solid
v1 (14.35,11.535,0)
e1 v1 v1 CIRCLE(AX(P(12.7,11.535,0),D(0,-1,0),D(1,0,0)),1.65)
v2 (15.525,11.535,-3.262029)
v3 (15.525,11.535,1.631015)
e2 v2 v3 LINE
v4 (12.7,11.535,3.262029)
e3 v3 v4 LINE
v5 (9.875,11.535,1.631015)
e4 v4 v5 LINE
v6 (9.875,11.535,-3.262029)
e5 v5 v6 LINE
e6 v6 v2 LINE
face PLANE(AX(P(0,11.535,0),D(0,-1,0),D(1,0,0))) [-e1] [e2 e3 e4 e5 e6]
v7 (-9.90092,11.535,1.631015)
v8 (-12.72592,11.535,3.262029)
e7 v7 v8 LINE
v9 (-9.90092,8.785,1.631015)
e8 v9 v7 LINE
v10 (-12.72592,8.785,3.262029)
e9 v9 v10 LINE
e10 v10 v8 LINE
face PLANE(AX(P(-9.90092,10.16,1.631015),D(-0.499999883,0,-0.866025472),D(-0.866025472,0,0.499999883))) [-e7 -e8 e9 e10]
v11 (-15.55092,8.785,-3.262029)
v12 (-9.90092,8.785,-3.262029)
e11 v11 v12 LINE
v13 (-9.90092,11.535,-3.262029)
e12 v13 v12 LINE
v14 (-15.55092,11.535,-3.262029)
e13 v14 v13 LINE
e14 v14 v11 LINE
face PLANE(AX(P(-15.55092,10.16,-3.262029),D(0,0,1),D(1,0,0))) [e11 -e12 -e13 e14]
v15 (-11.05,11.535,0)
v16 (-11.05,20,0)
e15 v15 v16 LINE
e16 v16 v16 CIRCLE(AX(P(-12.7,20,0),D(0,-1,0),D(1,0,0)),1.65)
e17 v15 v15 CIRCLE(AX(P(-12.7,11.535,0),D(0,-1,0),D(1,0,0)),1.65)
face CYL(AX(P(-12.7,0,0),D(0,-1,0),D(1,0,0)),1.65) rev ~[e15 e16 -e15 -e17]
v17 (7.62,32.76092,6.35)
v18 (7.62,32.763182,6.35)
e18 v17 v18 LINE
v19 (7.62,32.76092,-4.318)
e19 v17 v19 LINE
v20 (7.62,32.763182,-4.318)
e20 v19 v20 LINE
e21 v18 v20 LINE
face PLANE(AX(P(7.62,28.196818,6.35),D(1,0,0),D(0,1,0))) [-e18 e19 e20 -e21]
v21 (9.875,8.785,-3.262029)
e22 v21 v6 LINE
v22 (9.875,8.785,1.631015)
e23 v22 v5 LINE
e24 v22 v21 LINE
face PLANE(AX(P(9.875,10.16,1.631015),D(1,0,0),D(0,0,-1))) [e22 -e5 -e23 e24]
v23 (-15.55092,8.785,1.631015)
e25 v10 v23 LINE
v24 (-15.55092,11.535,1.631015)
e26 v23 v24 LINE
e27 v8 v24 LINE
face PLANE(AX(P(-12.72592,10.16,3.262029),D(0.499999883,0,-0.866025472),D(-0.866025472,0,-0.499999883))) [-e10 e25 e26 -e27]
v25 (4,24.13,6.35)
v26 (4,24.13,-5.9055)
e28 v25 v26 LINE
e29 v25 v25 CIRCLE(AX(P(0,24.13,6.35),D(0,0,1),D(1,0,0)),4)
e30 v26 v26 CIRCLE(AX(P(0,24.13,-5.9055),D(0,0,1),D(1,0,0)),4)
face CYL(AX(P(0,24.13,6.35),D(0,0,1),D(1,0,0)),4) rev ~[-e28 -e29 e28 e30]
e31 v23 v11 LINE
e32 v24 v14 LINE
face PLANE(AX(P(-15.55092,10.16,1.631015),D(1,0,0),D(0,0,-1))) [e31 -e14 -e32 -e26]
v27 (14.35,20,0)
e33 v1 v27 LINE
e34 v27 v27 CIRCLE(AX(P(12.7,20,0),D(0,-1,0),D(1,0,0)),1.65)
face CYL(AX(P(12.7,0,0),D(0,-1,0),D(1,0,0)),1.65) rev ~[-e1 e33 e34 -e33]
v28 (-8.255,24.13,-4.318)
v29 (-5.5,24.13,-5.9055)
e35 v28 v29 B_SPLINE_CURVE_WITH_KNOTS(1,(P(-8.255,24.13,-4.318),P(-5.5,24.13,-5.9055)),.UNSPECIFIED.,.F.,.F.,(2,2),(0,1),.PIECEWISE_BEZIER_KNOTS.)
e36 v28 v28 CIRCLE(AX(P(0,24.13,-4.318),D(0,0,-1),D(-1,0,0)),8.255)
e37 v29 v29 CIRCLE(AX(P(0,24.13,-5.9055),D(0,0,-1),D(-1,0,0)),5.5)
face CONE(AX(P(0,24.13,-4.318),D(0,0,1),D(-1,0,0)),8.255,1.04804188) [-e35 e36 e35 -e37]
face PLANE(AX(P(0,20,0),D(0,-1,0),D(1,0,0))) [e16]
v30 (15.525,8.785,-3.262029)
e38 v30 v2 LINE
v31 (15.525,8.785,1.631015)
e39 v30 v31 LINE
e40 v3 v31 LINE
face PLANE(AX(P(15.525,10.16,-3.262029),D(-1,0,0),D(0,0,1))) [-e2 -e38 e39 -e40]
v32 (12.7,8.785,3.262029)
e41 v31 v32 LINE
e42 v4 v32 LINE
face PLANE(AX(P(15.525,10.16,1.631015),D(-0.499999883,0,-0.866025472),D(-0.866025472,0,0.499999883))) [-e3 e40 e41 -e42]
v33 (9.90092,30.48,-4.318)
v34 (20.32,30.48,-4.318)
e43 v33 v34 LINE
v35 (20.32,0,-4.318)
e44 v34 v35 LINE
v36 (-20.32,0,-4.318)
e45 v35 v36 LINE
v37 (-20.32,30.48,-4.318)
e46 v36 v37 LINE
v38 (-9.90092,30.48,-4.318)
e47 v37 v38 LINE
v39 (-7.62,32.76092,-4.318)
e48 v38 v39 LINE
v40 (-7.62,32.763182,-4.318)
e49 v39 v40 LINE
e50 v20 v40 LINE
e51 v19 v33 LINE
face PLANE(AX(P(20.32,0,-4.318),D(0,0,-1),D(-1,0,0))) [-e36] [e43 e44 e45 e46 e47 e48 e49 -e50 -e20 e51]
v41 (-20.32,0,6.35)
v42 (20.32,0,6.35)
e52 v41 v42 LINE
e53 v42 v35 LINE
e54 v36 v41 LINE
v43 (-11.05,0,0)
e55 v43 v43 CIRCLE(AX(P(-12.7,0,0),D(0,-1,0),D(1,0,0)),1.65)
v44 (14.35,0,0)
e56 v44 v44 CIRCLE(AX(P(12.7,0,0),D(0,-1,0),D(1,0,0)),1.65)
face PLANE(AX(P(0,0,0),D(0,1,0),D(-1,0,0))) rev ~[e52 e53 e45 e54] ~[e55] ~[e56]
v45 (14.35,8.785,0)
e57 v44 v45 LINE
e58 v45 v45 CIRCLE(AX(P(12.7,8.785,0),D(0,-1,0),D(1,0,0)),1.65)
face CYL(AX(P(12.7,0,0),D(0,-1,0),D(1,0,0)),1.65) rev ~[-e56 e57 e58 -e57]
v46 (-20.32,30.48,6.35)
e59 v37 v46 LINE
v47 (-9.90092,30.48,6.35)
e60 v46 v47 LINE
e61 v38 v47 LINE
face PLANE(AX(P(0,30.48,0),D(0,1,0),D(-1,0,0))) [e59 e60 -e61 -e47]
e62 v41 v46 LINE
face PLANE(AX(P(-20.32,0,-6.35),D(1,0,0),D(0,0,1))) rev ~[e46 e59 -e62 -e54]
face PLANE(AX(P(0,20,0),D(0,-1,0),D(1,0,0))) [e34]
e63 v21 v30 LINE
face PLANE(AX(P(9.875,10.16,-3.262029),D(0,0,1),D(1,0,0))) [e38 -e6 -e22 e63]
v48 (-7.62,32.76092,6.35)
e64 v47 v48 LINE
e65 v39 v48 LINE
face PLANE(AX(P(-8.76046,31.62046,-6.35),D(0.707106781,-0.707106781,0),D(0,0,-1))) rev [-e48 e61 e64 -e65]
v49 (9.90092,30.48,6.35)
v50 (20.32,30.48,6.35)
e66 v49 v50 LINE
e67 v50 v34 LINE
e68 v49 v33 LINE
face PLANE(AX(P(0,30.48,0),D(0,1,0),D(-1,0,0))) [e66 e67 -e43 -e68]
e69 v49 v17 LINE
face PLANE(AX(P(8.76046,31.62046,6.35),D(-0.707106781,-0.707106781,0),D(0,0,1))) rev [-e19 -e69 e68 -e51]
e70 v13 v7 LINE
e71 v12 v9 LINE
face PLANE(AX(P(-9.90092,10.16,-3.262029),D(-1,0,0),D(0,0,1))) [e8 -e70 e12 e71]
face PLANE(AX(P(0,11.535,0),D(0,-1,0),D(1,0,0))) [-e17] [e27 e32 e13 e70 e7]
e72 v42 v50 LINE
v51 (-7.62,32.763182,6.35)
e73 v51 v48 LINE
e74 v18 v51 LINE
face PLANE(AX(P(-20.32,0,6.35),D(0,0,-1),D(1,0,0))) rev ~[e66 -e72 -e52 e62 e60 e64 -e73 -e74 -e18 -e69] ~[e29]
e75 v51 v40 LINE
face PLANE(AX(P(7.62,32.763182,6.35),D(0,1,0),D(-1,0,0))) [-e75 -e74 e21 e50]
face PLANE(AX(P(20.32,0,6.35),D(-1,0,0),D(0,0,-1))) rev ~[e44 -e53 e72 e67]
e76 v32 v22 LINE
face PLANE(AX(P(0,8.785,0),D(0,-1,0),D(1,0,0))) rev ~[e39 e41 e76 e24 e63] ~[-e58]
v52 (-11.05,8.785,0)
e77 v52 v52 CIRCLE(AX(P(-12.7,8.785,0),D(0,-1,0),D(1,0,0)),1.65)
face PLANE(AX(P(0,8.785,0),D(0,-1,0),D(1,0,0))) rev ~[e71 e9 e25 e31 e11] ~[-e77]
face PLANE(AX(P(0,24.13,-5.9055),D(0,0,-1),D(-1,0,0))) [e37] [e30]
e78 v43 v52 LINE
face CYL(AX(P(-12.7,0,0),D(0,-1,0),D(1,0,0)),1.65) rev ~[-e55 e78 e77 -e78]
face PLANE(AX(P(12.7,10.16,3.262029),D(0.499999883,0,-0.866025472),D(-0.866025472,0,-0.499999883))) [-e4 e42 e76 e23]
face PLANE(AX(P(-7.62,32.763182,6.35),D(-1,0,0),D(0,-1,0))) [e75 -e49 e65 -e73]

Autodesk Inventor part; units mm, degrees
sketch "Sketch3" plane through (0, 0, 0) normal (0, 1, 0) x (-1, 0, 0)
  line L0 (-20.32, 6.35) -> (20.32, 6.35)
  line L1 (20.32, 6.35) -> (20.32, -6.35)
  line L2 (20.32, -6.35) -> (-20.32, -6.35)
  line L3 (-20.32, -6.35) -> (-20.32, 6.35)
  line L4 (-20.32, 6.35) -> (20.32, -6.35) construction
  line L5 (20.32, 6.35) -> (-20.32, -6.35) construction
  point P0 (0, 0)
  dimension "d0" = 40.64
  dimension "d1" = 12.7
sketch "Sketch3 outline for Extrusion1" plane through (0, 0, 0) normal (0, 1, 0) x (-1, 0, 0)
  line L0 (-20.32, 6.35) -> (-20.32, -6.35)
  line L1 (20.32, 6.35) -> (-20.32, 6.35)
  line L2 (20.32, -6.35) -> (20.32, 6.35)
  line L3 (-20.32, -6.35) -> (20.32, -6.35)
extrude "Extrusion1" add sketch "Sketch3 outline for Extrusion1" along normal blind 30.48
sketch "Sketch4" plane through (-20.32, 0, 6.35) normal (0, 0, 1) x (1, 0, 0)
  line L0 (20.32, 0) -> (20.32, 24.13) construction
  circle A0 centre (20.32, 24.13) radius 4
  line L1 (12.7, 28.196818) -> (27.94, 28.196818)
  line L2 (27.94, 28.196818) -> (27.94, 32.763182)
  line L3 (27.94, 32.763182) -> (12.7, 32.763182)
  line L4 (12.7, 32.763182) -> (12.7, 28.196818)
  line L5 (40.64, 30.48) -> (0, 30.48)
  line L6 (12.7, 28.196818) -> (27.94, 32.763182) construction
  line L7 (27.94, 28.196818) -> (12.7, 32.763182) construction
  point P0 (20.32, 30.48)
  dimension "d4" = 24.13
  dimension "d5" = 8
  dimension "d6" = 15.24
sketch "Sketch4 outline for Extrusion2" plane through (-20.32, 0, 6.35) normal (0, 0, 1) x (1, 0, 0)
  line L0 (27.94, 32.763182) -> (12.7, 32.763182)
  line L1 (27.94, 28.196818) -> (27.94, 32.763182)
  line L2 (12.7, 28.196818) -> (27.94, 28.196818)
  line L3 (12.7, 32.763182) -> (12.7, 28.196818)
extrude "Extrusion2" add sketch "Sketch4 outline for Extrusion2" against normal up to surface (12.7 mm away)
sketch "Sketch4 outline for Extrusion3" plane through (-20.32, 0, 6.35) normal (0, 0, 1) x (1, 0, 0)
  circle A0 centre (20.32, 24.13) radius 4
extrude "Extrusion3" cut sketch "Sketch4 outline for Extrusion3" against normal blind 22.225
chamfer "Chamfer1" distance 2.28092 angle 45 2 edges at (7.62, 30.48, 0) (-7.62, 30.48, 0)
sketch "Sketch5" plane through (0, 0, 0) normal (0, -1, 0) x (1, 0, 0)
  line L0 (0, 0) -> (-12.7, 0) construction
  line L1 (0, 0) -> (12.7, 0) construction
  circle A0 centre (-12.7, 0) radius 1.65
  circle A1 centre (12.7, 0) radius 1.65
  dimension "d14" = 12.7
  dimension "d15" = 12.7
  dimension "d16" = 3.3
  dimension "d17" = 3.3
sketch "Sketch5 outline for Extrusion4" plane through (0, 0, 0) normal (0, -1, 0) x (1, 0, 0)
  circle A0 centre (12.7, 0) radius 1.65
  circle A1 centre (-12.7, 0) radius 1.65
extrude "Extrusion4" cut sketch "Sketch5 outline for Extrusion4" against normal blind 20
ref_plane "Work Plane1" through (20.32, 0, -4.318) normal (0, 0, -1) x (-1, 0, 0)
sketch "Sketch6" plane through (20.32, 0, -4.318) normal (0, 0, -1) x (-1, 0, 0)
  line L0 (0, 30.48) -> (10.41908, 30.48)
  line L1 (0, 0) -> (0, 30.48)
  line L2 (0, 0) -> (40.64, 0)
  line L3 (40.64, 0) -> (40.64, 30.48)
  line L4 (30.22092, 30.48) -> (40.64, 30.48)
  line L5 (27.94, 32.76092) -> (30.22092, 30.48)
  line L6 (12.7, 32.763182) -> (27.94, 32.763182)
  line L7 (10.41908, 30.48) -> (12.7, 32.76092)
  circle A0 centre (20.32, 24.13) radius 4
  line L8 (0, 30.48) -> (10.41908, 30.48)
  line L9 (0, 0) -> (0, 30.48)
  line L10 (0, 0) -> (40.64, 0)
  line L11 (40.64, 0) -> (40.64, 30.48)
  line L12 (30.22092, 30.48) -> (40.64, 30.48)
  line L13 (27.94, 32.76092) -> (30.22092, 30.48)
  line L14 (27.94, 32.763182) -> (27.94, 32.76092)
  line L15 (12.7, 32.763182) -> (27.94, 32.763182)
  line L16 (12.7, 32.76092) -> (12.7, 32.763182)
  line L17 (10.41908, 30.48) -> (12.7, 32.76092)
  line L18 (0, 30.48) -> (0, 0)
  line L19 (40.64, 0) -> (0, 0)
  line L20 (40.64, 0) -> (40.64, 30.48)
  line L21 (40.64, 30.48) -> (30.22092, 30.48)
  line L22 (30.22092, 30.48) -> (27.94, 32.763182)
  line L23 (27.94, 32.763182) -> (12.7, 32.76092)
  line L24 (12.7, 32.76092) -> (10.41908, 30.48)
  line L25 (0, 30.48) -> (10.41908, 30.48)
  point P0 (20.32, 0)
sketch "Sketch6 outline for Extrusion5" plane through (20.32, 0, -4.318) normal (0, 0, -1) x (-1, 0, 0)
  line L0 (27.94, 32.76092) -> (27.94, 32.763182)
  line L1 (30.22092, 30.48) -> (27.94, 32.76092)
  line L2 (27.94, 32.763182) -> (12.7, 32.76092)
  line L3 (40.64, 30.48) -> (30.22092, 30.48)
  line L4 (12.7, 32.76092) -> (10.41908, 30.48)
  line L5 (40.64, 0) -> (40.64, 30.48)
  line L6 (10.41908, 30.48) -> (0, 30.48)
  line L7 (0, 0) -> (40.64, 0)
  line L8 (0, 30.48) -> (0, 0)
  circle A0 centre (20.32, 24.13) radius 4
extrude "Extrusion5" cut sketch "Sketch6 outline for Extrusion5" along normal blind 20
sketch "Sketch7" plane through (20.32, 0, -4.318) normal (0, 0, -1) x (-1, 0, 0)
  circle A0 centre (20.32, 24.13) radius 8.255
  point P0 (20.32, 0)
ref_plane "Work Plane2" through (20.32, 0, -5.9055) normal (0, 0, -1) x (-1, 0, 0)
sketch "Sketch8" plane through (20.32, 0, -5.9055) normal (0, 0, -1) x (-1, 0, 0)
  circle A0 centre (20.32, 24.13) radius 5.5
  point P0 (20.32, 0)
  dimension "d25" = 11
sketch "Sketch7 outline for Loft1" plane through (20.32, 0, -4.318) normal (0, 0, -1) x (-1, 0, 0)
  circle A0 centre (20.32, 24.13) radius 8.255
sketch "Sketch8 outline for Loft1" plane through (20.32, 0, -5.9055) normal (0, 0, -1) x (-1, 0, 0)
  circle A0 centre (20.32, 24.13) radius 5.5
loft "Loft1" add profiles "Sketch7 outline for Loft1", "Sketch8 outline for Loft1"
sketch "Sketch9" plane through (-20.32, 0, 6.35) normal (0, 0, 1) x (1, 0, 0)
  circle A0 centre (20.32, 24.13) radius 4 projected
  point P0 (20.32, 0)
sketch "Sketch9 outline for Extrusion6" plane through (-20.32, 0, 6.35) normal (0, 0, 1) x (1, 0, 0)
  circle A0 centre (20.32, 24.13) radius 4
extrude "Extrusion6" cut sketch "Sketch9 outline for Extrusion6" against normal blind 129.224999
ref_plane "Work Plane3" through (0, 10.16, 0) normal (0, -1, 0) x (1, 0, 0)
sketch "Sketch10" plane through (0, 10.16, 0) normal (0, -1, 0) x (1, 0, 0)
  circle A0 centre (-12.7, 0) radius 1.65
  line L0 (-15.5782, 0) -> (-9.87364, 0) construction
  line L1 (-9.90092, 1.631015) -> (-9.90092, -1.631015)
  line L2 (-15.55092, -1.631015) -> (-15.55092, 1.631015)
  line L3 (-12.72592, 3.262029) -> (-9.90092, 1.631015)
  line L4 (-15.55092, 1.631015) -> (-12.72592, 3.262029)
  line L5 (-12.72592, 0) -> (-9.90092, 0) construction
  line L6 (9.84772, 0) -> (15.55228, 0) construction
  line L7 (15.525, 1.631015) -> (15.525, -1.631015)
  line L8 (9.875, -1.631015) -> (9.875, 1.631015)
  line L9 (12.7, 3.262029) -> (15.525, 1.631015)
  line L10 (9.875, 1.631015) -> (12.7, 3.262029)
  line L11 (12.7, 0) -> (15.525, 0) construction
  circle A1 centre (12.7, 0) radius 1.65
  line L12 (15.525, -1.631015) -> (15.525, -3.262029)
  line L13 (15.525, -3.262029) -> (9.875, -3.262029)
  line L14 (9.875, -3.262029) -> (9.875, -1.631015)
  line L15 (-9.90092, -1.631015) -> (-9.90092, -3.262029)
  line L16 (-9.90092, -4.318) -> (-9.90092, 6.35)
  line L17 (-12.72592, -3.262029) -> (-9.90092, -3.262029)
  line L18 (-12.72592, -3.262029) -> (-15.55092, -3.262029)
  line L19 (-15.55092, -3.262029) -> (-15.55092, -1.631015)
  point P0 (0, 0)
  point P1 (-12.7, -1.132545)
  point P2 (-12.7, -3.5)
  point P3 (12.7, -1.132545)
  point P4 (12.7, -3.5)
  dimension "d34" = 2.825
  dimension "d35" = 2.825
sketch "Sketch10 outline for Extrusion7" plane through (0, 10.16, 0) normal (0, -1, 0) x (1, 0, 0)
  line L0 (-15.55092, -3.262029) -> (-9.90092, -3.262029)
  line L1 (-9.90092, -3.262029) -> (-9.90092, 1.631015)
  line L2 (-9.90092, 1.631015) -> (-12.72592, 3.262029)
  line L3 (-12.72592, 3.262029) -> (-15.55092, 1.631015)
  line L4 (-15.55092, 1.631015) -> (-15.55092, -3.262029)
  line L5 (15.525, 1.631015) -> (12.7, 3.262029)
  line L6 (12.7, 3.262029) -> (9.875, 1.631015)
  line L7 (9.875, 1.631015) -> (9.875, -3.262029)
  line L8 (9.875, -3.262029) -> (15.525, -3.262029)
  line L9 (15.525, -3.262029) -> (15.525, 1.631015)
extrude "Extrusion7" cut sketch "Sketch10 outline for Extrusion7" along normal mid plane 2.75
sketch "Sketch11" plane through (20.32, 0, -4.318) normal (0, 0, -1) x (-1, 0, 0)
  line L0 (29.08046, 32.526826) -> (11.260311, 32.526826)
  line L1 (11.260311, 32.526826) -> (11.260311, 35.082572)
  line L2 (11.260311, 35.082572) -> (29.08046, 35.082572)
  line L3 (29.08046, 35.082572) -> (29.08046, 32.526826)
  point P0 (20.32, 0)
sketch "Sketch11 outline for Extrusion8" plane through (20.32, 0, -4.318) normal (0, 0, -1) x (-1, 0, 0)
  line L0 (29.08046, 32.526826) -> (29.08046, 35.082572)
  line L1 (11.260311, 32.526826) -> (29.08046, 32.526826)
  line L2 (11.260311, 35.082572) -> (11.260311, 32.526826)
  line L3 (29.08046, 35.082572) -> (11.260311, 35.082572)
extrude "Extrusion8" cut sketch "Sketch11 outline for Extrusion8" along normal blind 9.949993
properties part number "Roller Bracket"
